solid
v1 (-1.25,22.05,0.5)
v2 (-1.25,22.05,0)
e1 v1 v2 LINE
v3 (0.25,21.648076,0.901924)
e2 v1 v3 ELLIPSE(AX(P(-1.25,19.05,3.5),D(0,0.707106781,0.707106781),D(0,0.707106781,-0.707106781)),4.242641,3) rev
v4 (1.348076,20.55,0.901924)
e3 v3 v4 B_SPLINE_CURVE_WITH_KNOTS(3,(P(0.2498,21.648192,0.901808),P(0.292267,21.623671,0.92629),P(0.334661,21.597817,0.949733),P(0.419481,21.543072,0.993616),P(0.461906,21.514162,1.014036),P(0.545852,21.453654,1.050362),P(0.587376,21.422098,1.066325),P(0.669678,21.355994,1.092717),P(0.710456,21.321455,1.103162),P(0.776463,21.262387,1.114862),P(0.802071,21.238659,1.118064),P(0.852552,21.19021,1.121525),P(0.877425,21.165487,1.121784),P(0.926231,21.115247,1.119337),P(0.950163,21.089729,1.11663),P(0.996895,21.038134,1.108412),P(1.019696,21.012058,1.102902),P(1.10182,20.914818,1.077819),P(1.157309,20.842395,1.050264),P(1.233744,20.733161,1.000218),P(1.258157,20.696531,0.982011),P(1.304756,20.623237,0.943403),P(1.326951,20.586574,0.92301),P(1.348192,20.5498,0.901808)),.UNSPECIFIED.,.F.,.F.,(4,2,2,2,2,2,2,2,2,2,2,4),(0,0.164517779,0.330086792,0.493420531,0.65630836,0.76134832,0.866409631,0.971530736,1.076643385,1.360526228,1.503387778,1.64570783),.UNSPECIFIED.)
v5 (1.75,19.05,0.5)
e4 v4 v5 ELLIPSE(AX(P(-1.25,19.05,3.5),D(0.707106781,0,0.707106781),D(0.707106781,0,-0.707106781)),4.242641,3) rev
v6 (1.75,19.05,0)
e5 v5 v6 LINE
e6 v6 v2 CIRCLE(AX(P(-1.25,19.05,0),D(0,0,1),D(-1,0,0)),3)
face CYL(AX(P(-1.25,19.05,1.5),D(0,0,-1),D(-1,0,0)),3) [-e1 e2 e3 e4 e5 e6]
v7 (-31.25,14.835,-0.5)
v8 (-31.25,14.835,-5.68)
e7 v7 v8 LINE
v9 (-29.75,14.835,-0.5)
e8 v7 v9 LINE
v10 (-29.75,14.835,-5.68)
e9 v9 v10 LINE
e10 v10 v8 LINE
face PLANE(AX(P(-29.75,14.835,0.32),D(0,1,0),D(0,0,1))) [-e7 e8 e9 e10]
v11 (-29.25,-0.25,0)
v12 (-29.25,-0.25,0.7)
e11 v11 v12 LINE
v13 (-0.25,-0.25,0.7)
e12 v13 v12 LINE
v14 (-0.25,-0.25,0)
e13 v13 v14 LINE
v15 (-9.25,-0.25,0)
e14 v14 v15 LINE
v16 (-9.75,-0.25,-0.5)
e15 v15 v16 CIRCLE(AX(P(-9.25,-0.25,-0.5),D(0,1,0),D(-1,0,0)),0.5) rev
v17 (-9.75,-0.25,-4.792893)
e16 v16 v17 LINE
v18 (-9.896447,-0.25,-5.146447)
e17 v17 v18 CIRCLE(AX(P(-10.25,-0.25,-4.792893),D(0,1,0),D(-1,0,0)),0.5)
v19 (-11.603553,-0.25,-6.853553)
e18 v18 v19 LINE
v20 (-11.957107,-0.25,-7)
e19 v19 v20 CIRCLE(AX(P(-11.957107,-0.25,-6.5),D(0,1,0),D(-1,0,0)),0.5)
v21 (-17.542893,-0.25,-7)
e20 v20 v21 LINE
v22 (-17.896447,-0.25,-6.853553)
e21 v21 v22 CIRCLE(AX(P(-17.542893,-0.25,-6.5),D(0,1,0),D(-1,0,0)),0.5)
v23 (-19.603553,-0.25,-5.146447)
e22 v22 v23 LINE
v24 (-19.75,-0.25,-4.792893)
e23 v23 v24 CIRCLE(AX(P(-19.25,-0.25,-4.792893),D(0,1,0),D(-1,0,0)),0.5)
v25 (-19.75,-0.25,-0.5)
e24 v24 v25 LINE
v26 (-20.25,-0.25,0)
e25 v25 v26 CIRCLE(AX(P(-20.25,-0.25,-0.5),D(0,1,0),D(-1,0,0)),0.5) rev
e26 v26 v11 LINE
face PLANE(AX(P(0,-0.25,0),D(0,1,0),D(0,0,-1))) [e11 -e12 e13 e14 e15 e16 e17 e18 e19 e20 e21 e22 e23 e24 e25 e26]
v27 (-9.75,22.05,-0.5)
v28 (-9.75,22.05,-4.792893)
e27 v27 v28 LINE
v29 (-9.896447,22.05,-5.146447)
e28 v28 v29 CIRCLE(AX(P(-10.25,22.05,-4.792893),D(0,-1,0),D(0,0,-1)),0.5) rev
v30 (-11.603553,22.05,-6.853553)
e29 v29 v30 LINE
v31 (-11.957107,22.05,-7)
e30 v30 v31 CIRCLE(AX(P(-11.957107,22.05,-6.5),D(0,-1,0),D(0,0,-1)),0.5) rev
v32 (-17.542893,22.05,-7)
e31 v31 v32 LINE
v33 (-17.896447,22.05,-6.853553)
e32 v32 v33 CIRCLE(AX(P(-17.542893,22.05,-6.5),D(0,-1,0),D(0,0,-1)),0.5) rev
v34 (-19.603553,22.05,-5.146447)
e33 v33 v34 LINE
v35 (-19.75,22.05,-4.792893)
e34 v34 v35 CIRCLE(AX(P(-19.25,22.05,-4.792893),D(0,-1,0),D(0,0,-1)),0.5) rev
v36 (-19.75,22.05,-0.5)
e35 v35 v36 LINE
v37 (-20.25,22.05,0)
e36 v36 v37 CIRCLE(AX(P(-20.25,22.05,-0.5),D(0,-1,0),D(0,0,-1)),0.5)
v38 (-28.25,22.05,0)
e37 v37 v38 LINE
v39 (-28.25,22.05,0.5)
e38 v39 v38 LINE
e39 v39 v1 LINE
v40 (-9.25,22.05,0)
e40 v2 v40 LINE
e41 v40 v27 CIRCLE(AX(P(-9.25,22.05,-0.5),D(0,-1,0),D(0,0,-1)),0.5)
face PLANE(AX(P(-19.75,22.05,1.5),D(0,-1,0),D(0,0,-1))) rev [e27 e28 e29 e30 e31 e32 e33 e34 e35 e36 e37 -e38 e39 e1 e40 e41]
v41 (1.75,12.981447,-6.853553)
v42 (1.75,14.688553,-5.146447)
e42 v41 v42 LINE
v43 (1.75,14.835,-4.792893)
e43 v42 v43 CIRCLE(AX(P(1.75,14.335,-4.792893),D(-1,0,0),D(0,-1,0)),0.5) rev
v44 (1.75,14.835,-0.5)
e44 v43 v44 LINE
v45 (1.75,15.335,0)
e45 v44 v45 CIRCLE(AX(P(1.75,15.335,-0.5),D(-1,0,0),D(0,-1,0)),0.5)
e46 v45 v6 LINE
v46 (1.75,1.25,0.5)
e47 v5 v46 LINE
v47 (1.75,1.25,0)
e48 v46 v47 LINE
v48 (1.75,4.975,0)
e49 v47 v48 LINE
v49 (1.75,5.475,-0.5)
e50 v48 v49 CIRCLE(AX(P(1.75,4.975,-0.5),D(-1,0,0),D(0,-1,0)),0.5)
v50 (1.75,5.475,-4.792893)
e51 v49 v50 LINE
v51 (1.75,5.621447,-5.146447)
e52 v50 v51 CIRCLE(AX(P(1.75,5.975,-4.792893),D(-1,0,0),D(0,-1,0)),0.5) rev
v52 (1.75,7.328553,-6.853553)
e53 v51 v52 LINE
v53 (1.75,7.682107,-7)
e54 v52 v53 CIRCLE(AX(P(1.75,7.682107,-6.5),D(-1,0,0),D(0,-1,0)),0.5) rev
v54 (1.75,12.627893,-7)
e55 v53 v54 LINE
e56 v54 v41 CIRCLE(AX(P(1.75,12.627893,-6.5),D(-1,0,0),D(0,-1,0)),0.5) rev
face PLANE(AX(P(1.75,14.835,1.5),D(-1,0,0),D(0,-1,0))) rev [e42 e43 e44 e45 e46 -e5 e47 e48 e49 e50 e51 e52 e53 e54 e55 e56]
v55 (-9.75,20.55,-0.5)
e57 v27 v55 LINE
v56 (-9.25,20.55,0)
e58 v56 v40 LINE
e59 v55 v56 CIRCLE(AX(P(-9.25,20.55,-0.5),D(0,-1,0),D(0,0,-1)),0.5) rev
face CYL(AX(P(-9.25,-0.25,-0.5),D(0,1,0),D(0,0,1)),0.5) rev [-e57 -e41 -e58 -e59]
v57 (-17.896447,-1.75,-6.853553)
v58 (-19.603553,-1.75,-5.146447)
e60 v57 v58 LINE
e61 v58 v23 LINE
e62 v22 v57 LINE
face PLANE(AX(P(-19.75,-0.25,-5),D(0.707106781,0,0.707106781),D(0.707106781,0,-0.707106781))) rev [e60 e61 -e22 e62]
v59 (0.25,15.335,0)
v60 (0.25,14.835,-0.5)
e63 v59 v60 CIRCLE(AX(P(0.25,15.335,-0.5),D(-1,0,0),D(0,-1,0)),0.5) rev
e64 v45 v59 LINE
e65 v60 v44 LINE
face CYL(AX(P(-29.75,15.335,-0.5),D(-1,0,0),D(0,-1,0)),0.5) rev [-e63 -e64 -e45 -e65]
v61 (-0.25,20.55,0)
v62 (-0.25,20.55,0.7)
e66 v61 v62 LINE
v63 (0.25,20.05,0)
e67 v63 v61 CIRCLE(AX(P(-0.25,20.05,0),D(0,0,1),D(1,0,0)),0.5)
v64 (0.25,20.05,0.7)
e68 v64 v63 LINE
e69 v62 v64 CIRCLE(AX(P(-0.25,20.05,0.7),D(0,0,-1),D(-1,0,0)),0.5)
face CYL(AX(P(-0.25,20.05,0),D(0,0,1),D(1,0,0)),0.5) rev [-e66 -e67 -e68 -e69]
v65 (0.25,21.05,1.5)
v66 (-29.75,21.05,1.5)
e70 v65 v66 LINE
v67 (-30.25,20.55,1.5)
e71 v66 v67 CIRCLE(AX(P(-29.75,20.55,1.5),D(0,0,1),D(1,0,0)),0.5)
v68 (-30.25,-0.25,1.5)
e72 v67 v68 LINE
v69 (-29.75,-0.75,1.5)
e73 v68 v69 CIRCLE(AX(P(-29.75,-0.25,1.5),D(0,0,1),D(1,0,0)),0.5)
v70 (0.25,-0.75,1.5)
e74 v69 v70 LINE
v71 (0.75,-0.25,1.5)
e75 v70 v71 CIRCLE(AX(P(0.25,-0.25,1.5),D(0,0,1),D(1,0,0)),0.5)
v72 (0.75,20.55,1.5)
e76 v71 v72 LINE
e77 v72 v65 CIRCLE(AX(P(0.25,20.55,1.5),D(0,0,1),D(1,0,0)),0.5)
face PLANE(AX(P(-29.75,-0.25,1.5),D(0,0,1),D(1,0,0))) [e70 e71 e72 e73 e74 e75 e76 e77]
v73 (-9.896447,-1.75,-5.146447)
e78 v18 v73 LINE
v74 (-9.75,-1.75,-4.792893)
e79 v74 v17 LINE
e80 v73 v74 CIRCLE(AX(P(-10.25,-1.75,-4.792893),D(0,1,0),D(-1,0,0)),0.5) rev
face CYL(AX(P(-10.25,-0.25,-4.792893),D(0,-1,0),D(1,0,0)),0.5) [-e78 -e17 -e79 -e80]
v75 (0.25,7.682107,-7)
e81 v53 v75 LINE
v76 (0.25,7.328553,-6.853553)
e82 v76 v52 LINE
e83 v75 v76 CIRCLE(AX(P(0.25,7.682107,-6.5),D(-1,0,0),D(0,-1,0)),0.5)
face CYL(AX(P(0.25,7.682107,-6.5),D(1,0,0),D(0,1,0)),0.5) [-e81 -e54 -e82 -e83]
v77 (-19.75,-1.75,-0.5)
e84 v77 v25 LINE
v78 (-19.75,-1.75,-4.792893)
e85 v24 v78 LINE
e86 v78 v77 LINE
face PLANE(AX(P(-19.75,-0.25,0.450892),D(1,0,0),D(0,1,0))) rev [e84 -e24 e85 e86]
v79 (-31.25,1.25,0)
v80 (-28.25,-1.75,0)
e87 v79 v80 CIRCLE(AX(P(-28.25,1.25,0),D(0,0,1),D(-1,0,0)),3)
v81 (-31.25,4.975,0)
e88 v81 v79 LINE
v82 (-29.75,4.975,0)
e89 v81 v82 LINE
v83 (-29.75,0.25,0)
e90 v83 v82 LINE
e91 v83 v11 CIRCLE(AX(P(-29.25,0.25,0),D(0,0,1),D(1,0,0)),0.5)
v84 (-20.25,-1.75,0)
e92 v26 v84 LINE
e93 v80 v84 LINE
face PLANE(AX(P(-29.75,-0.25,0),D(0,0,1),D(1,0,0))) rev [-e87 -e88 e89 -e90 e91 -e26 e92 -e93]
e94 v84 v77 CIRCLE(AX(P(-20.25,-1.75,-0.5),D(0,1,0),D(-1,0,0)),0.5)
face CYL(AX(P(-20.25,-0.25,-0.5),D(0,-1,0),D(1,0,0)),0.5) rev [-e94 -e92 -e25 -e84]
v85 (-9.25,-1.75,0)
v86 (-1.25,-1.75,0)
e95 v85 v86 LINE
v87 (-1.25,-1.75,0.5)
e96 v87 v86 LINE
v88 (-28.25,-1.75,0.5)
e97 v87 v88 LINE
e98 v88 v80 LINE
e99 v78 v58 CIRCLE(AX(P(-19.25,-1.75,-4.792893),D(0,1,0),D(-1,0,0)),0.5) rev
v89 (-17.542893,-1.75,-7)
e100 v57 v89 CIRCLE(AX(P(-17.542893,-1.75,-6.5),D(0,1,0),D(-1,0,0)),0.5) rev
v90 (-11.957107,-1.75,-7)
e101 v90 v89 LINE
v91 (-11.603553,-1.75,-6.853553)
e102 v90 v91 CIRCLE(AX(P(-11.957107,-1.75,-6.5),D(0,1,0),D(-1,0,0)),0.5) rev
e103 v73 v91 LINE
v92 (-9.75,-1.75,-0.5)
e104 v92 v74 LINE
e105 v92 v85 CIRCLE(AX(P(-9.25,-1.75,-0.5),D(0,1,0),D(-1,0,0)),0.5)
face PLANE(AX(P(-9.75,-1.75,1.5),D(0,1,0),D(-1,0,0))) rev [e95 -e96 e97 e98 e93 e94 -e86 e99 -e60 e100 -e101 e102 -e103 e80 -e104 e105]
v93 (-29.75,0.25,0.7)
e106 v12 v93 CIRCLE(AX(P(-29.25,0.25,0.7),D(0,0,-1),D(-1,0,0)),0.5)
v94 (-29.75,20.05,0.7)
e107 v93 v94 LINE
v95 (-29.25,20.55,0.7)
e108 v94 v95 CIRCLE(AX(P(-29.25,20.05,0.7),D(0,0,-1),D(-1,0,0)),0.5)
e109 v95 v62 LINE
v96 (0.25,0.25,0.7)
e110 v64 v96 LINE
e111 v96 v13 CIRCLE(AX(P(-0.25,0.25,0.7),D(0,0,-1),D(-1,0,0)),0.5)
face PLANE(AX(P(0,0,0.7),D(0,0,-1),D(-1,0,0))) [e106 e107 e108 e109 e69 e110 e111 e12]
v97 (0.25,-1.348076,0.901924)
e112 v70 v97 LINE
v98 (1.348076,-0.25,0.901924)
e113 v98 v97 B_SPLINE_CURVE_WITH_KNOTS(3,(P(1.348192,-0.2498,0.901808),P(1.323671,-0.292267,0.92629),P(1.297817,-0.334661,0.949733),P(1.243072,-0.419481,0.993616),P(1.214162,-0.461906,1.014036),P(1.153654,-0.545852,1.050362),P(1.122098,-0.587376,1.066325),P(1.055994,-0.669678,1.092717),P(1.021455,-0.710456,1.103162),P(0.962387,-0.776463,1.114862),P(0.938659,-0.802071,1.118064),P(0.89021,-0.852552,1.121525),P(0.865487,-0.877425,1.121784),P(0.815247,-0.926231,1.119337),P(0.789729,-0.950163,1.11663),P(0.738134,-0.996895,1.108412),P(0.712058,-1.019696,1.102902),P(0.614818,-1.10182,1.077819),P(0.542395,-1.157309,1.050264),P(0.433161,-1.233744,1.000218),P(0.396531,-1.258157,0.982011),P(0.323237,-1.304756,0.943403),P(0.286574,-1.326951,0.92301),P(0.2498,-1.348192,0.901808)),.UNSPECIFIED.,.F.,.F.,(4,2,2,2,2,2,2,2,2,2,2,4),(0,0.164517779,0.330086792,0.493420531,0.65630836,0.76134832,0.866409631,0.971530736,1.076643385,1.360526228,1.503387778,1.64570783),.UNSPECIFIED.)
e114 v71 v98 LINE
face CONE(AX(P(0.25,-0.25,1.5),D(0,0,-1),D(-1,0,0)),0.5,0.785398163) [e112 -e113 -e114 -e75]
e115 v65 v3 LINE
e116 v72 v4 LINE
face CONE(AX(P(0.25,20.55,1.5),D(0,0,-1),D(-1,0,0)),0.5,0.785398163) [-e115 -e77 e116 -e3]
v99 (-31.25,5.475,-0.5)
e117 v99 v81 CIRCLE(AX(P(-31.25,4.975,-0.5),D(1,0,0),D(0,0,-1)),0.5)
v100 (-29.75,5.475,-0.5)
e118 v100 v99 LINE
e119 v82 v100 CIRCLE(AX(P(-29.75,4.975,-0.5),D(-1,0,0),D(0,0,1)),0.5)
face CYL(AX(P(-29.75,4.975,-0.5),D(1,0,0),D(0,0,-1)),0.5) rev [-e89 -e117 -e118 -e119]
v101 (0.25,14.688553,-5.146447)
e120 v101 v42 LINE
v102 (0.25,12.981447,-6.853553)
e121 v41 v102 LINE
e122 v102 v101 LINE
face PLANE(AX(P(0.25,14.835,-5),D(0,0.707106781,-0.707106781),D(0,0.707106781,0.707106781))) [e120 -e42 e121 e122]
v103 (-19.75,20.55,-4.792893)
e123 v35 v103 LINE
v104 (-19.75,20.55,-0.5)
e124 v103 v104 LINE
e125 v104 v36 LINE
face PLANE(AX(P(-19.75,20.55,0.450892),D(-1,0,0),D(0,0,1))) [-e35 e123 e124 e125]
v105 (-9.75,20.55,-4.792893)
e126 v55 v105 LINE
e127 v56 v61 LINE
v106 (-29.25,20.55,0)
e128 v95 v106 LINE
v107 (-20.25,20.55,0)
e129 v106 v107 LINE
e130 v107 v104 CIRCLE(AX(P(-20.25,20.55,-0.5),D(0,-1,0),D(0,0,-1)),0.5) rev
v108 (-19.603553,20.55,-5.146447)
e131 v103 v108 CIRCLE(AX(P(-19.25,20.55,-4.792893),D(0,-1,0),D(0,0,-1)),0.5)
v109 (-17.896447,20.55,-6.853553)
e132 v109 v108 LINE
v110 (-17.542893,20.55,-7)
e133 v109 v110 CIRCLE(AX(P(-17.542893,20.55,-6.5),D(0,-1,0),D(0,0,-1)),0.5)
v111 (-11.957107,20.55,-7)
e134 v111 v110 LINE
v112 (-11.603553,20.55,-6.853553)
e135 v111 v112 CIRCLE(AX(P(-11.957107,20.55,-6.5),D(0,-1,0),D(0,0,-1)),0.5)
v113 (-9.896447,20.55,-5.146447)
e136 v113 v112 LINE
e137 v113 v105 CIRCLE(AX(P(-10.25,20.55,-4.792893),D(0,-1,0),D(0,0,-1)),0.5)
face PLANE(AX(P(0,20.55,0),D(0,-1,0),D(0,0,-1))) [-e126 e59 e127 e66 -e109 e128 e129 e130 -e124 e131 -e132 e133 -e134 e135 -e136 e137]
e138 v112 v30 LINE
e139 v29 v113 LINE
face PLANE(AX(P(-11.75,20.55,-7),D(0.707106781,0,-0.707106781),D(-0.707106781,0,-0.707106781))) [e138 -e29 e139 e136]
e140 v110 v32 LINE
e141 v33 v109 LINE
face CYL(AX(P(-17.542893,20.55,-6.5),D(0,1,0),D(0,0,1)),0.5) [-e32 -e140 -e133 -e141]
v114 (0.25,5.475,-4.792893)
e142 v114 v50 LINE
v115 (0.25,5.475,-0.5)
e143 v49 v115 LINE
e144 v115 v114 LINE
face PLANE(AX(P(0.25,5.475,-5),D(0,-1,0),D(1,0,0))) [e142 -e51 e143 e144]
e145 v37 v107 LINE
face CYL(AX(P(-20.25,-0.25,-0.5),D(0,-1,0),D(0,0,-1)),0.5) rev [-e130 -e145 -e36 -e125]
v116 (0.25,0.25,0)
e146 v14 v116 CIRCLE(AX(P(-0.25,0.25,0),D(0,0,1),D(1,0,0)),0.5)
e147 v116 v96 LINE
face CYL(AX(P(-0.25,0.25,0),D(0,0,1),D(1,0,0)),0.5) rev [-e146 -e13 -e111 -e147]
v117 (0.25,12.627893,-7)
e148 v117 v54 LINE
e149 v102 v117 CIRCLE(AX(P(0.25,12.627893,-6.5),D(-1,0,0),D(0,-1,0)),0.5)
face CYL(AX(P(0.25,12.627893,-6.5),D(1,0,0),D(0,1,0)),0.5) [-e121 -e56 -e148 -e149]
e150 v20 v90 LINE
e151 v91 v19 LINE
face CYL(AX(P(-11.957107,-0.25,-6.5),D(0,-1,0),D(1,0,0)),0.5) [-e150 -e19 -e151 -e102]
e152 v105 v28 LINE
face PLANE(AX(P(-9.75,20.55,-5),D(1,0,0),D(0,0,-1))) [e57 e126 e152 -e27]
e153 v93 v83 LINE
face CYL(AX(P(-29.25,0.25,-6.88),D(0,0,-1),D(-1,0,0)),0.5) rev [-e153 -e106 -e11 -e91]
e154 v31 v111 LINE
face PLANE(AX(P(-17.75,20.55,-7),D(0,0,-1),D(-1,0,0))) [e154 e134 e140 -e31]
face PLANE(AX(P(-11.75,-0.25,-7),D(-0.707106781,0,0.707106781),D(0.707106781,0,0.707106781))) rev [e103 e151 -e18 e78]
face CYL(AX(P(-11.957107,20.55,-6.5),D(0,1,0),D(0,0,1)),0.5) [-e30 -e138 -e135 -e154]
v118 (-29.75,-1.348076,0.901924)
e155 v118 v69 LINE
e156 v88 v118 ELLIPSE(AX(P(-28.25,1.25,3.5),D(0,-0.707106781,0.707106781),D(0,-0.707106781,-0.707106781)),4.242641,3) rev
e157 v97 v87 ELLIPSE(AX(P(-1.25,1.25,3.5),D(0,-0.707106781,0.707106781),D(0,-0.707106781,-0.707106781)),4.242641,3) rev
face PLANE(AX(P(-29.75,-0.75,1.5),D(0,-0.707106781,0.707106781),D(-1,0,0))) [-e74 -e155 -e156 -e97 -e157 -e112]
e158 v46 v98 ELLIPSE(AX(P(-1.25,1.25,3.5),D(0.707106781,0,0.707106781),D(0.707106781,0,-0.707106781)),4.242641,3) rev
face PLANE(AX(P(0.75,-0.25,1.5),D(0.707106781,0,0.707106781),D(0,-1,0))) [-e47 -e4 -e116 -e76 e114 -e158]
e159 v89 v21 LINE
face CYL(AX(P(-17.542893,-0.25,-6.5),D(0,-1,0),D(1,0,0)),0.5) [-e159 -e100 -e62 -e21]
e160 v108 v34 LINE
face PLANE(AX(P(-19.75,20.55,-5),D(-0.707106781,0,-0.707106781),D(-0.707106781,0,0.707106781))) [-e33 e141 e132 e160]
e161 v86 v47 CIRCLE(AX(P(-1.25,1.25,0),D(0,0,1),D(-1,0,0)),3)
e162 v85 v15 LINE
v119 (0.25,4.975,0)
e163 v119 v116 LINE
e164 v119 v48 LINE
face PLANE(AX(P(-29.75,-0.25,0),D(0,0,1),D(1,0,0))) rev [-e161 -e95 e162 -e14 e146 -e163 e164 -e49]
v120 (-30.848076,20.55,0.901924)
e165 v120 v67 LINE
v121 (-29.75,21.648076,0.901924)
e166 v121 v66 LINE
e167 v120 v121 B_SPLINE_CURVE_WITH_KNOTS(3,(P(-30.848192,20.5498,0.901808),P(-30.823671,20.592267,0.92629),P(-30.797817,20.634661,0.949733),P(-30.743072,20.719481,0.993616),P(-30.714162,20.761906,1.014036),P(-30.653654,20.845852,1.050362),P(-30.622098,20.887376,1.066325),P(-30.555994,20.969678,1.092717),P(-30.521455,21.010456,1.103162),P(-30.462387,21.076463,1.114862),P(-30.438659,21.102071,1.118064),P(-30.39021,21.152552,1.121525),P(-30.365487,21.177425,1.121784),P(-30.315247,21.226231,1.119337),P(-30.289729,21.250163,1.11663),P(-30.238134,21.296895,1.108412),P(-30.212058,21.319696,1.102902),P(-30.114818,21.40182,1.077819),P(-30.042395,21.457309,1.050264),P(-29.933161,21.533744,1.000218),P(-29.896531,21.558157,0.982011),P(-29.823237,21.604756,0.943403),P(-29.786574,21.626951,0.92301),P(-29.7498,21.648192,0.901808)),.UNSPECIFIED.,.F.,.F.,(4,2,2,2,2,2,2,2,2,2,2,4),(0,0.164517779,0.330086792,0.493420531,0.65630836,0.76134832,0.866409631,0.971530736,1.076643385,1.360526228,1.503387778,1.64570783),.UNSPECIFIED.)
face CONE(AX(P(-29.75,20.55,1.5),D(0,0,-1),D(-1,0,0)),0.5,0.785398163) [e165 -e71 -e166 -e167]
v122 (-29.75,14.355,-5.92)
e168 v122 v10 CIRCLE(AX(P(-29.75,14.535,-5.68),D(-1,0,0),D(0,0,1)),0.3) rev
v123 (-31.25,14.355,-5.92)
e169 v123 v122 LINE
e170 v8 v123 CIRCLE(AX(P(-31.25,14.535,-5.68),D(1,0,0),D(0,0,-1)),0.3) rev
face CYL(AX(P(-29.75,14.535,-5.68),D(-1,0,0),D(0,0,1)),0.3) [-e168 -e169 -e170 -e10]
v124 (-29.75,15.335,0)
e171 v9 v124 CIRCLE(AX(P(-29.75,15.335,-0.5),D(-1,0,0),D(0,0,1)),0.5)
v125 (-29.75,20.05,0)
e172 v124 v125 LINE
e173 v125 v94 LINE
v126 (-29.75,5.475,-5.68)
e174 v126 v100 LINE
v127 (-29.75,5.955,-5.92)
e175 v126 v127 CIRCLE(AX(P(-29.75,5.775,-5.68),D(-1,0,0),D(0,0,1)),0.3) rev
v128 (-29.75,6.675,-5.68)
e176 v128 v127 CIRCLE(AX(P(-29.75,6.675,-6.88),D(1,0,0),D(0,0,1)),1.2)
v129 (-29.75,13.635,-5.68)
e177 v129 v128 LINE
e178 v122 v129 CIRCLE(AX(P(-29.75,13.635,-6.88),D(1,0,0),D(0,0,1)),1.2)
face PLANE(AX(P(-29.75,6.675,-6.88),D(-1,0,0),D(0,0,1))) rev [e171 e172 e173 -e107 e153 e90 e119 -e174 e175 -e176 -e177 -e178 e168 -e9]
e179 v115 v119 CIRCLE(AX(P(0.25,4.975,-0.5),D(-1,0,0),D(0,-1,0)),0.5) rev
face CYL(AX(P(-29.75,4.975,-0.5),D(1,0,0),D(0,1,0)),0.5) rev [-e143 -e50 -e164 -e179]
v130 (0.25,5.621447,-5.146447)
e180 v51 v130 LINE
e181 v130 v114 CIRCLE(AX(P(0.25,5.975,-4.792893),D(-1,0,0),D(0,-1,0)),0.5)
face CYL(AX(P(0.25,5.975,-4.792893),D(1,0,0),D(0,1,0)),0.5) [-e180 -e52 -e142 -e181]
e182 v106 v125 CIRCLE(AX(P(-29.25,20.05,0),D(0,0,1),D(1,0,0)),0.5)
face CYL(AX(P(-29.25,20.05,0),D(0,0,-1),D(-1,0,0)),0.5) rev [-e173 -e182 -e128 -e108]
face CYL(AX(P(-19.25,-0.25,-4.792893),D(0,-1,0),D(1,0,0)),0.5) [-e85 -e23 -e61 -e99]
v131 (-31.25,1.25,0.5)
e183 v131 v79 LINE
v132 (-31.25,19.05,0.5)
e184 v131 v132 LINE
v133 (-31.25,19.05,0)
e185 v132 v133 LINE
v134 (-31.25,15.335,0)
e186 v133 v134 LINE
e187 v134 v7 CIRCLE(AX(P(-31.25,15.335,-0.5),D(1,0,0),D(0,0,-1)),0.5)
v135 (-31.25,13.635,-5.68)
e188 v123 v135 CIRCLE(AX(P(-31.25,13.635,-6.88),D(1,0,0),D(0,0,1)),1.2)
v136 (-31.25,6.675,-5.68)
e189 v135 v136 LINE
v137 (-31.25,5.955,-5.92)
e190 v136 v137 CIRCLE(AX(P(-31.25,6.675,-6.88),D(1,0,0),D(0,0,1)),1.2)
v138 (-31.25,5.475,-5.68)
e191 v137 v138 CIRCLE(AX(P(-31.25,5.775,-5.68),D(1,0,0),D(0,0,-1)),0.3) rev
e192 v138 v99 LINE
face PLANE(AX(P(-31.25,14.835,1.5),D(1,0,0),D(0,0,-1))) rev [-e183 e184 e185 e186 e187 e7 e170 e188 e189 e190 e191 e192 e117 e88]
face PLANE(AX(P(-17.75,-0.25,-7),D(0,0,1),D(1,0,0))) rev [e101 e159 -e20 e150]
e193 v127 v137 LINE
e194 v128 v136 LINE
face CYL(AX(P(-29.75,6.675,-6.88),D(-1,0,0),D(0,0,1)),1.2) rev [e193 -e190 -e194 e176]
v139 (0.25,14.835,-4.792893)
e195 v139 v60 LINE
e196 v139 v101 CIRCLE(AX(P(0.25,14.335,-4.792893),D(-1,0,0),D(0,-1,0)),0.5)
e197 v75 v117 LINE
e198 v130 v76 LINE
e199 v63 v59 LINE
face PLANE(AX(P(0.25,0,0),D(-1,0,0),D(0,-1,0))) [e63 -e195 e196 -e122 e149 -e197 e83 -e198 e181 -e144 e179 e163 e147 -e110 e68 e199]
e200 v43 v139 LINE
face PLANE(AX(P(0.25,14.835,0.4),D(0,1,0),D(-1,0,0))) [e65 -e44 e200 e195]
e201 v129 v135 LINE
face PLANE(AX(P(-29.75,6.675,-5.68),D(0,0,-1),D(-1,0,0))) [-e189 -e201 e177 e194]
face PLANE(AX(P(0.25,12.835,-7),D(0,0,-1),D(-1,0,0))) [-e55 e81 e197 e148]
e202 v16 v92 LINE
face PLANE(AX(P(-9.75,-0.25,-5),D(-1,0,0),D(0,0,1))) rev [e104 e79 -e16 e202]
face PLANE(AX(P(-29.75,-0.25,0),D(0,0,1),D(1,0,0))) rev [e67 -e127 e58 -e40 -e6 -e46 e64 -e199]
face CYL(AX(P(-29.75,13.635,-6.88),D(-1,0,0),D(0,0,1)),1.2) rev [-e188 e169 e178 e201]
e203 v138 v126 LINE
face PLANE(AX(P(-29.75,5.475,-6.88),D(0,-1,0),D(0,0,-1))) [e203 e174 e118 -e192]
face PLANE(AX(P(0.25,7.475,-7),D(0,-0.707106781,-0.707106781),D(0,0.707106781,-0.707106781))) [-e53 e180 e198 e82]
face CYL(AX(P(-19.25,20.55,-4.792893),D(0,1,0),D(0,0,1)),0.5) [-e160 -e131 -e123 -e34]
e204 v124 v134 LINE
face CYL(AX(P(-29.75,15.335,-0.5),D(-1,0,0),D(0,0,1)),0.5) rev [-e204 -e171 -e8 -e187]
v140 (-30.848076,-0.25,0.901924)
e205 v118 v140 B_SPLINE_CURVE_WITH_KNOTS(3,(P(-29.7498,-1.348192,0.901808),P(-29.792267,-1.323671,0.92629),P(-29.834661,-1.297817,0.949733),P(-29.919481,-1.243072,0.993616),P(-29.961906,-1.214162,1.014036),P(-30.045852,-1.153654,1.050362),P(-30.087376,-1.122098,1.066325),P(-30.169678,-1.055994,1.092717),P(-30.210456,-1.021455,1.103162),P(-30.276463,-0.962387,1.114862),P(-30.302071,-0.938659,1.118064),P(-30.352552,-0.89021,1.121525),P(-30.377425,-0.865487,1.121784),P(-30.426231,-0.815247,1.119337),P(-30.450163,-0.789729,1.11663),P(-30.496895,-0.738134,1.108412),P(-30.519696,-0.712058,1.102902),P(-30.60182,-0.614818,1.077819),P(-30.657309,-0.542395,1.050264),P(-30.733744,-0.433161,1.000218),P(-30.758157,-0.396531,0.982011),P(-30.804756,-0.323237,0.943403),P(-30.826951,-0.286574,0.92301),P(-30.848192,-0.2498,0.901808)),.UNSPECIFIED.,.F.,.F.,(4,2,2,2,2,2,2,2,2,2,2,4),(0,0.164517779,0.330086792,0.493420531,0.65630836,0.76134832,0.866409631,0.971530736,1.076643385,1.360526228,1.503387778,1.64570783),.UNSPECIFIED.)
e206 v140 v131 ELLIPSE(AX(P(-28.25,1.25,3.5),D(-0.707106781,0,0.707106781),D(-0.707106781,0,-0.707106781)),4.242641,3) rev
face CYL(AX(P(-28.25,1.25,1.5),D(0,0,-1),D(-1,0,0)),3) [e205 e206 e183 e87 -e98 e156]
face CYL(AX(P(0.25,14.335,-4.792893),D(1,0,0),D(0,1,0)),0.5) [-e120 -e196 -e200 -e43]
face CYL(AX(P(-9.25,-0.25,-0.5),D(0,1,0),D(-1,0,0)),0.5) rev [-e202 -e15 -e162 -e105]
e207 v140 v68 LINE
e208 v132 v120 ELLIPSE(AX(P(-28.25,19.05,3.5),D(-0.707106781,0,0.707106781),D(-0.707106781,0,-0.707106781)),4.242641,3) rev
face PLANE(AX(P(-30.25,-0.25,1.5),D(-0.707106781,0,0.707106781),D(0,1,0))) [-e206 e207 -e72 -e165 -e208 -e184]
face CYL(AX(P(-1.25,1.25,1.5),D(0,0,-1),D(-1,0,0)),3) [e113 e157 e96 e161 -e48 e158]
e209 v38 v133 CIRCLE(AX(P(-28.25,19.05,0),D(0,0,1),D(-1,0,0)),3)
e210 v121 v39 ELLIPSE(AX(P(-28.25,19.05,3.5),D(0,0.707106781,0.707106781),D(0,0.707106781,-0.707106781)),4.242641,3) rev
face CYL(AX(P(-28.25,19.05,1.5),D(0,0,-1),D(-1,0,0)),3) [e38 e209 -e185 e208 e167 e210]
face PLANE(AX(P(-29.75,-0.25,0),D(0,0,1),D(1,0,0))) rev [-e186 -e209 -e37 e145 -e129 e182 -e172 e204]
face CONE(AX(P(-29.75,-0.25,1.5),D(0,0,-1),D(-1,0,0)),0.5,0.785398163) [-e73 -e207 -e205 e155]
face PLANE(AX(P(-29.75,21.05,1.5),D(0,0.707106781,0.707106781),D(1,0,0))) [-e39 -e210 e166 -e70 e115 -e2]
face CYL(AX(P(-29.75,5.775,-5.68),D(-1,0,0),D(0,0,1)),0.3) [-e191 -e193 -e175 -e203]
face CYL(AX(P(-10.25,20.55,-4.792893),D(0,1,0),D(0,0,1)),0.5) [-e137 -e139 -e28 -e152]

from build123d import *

# Parameters (mm, degrees)
EXTRUDE_1_DEPTH     = 1.5
CHAMFER_1_SIZE      = 1
EXTRUDE_3_DEPTH     = 1.5
EXTRUDE_4_DEPTH     = 1.5
EXTRUDE_5_DEPTH     = 1.5
FILLET_START        = -32
FILLET_2_DEPTH      = 3
FILLET_3_R          = 0.5
SKETCH_8_W          = 30
SKETCH_8_H          = 20.8
CUT_EXTRUDE_1_DEPTH = 0.7
FILLET_4_R          = 0.5
CUT_EXTRUDE_8_DEPTH = 39.881422299


with BuildPart() as part:
    # 草图1 → 凸台-拉伸1 (new body)
    with BuildSketch(Plane.XY):
        with BuildLine():
            Line((-29.75, -1.75), (-19.75, -1.75))
            Line((-19.75, -1.75), (-9.75, -1.75))
            Line((-9.75, -1.75), (0.25, -1.75))
            ThreePointArc((0.25, -1.75), (1.310660172, -1.310660172), (1.75, -0.25))
            Line((1.75, -0.25), (1.75, 5.475))
            Line((1.75, 5.475), (1.75, 14.835))
            Line((1.75, 14.835), (1.75, 20.55))
            ThreePointArc((1.75, 20.55), (1.310660172, 21.610660172), (0.25, 22.05))
            Line((0.25, 22.05), (-9.75, 22.05))
            Line((-9.75, 22.05), (-19.75, 22.05))
            Line((-19.75, 22.05), (-29.75, 22.05))
            ThreePointArc((-29.75, 22.05), (-30.810660172, 21.610660172), (-31.25, 20.55))
            Line((-31.25, 20.55), (-31.25, 14.835))
            Line((-31.25, 14.835), (-31.25, 5.475))
            Line((-31.25, 5.475), (-31.25, -0.25))
            ThreePointArc((-31.25, -0.25), (-30.810660172, -1.310660172), (-29.75, -1.75))
        make_face()
    extrude(amount=EXTRUDE_1_DEPTH)

    # 倒角1
    chamfer_1_edges = [part.edges().sort_by_distance(p)[0] for p in [
        (-14.75, -1.75, 1.5),
        (1.310660172, -1.310660172, 1.5),
        (1.75, 10.15, 1.5),
        (1.310660172, 21.610660172, 1.5),
        (-14.75, 22.05, 1.5),
        (-31.25, 10.15, 1.5),
        (-30.810660172, 21.610660172, 1.5),
        (-30.810660172, -1.310660172, 1.5),
    ]]
    chamfer(chamfer_1_edges, length=CHAMFER_1_SIZE)

    # 草图3 → 凸台-拉伸3 (add)
    with BuildSketch(Plane(origin=(0, 22.05, 0), x_dir=(1, 0, 0), z_dir=(0, 1, 0))):
        Polygon((-19.75, -0.450892119), (-9.75, -0.450892119), (-9.75, 5), (-11.75, 7), (-17.75, 7), (-19.75, 5), align=None)
    extrude_3 = extrude(amount=-EXTRUDE_3_DEPTH)

    # 镜向1: 凸台-拉伸3 across plane
    add(extrude_3.mirror(Plane.ZX.offset(10.15)))

    # 草图4 → 凸台-拉伸4 (add)
    with BuildSketch(Plane(origin=(1.75, 0, 0), x_dir=(0, 0, -1), z_dir=(1, 0, 0))):
        Polygon((-0.4, 14.835), (5, 14.835), (7, 12.835), (7, 7.475), (5, 5.475), (-0.4, 5.475), align=None)
    extrude(amount=-EXTRUDE_4_DEPTH)

    # 草图6 → 凸台-拉伸5 (add)
    with BuildSketch(Plane.ZY.offset(31.25)):
        with BuildLine():
            Line((0.32, 14.835), (0.32, 5.475))
            Line((0.32, 5.475), (-6.88, 5.475))
            ThreePointArc((-6.88, 5.475), (-6.031471863, 5.826471863), (-5.68, 6.675))
            Line((-5.68, 6.675), (-5.68, 13.635))
            ThreePointArc((-5.68, 13.635), (-6.031471863, 14.483528137), (-6.88, 14.835))
            Line((-6.88, 14.835), (0.32, 14.835))
        make_face()
    extrude(amount=-EXTRUDE_5_DEPTH)

    # 圆角2: read off the stored shape, not the designer's step
    # 圆角2 outline → 圆角2 (cut)
    with BuildSketch(Plane.YZ.offset(FILLET_START)):
        with BuildLine():
            Line((14.835, -6.88), (14.835, -5.68))
            ThreePointArc((14.835, -5.68), (14.669164079, -5.948328157), (14.355, -5.92))
            ThreePointArc((14.355, -5.92), (14.708312629, -6.343343686), (14.835, -6.88))
        make_face()
        with BuildLine():
            ThreePointArc((5.475, -6.88), (5.601687371, -6.343343686), (5.955, -5.92))
            ThreePointArc((5.955, -5.92), (5.640835921, -5.948328157), (5.475, -5.68))
            Line((5.475, -5.68), (5.475, -6.88))
        make_face()
    extrude(amount=FILLET_2_DEPTH, mode=Mode.SUBTRACT)

    # 圆角3
    fillet_3_edges = [part.edges().sort_by_distance(p)[0] for p in [
        (-9.75, -1, 0),
        (-19.75, -1, 0),
        (-19.75, -1, -5),
        (-9.75, -1, -5),
        (-11.75, -1, -7),
        (-17.75, -1, -7),
        (1, 5.475, -5),
        (1, 14.835, 0),
        (1, 14.835, -5),
        (1, 12.835, -7),
        (1, 7.475, -7),
        (1, 5.475, 0),
        (-30.5, 14.835, 0),
        (-30.5, 5.475, 0),
        (-9.75, 21.3, 0),
        (-19.75, 21.3, 0),
        (-9.75, 21.3, -5),
        (-19.75, 21.3, -5),
        (-17.75, 21.3, -7),
        (-11.75, 21.3, -7),
    ]]
    fillet(fillet_3_edges, radius=FILLET_3_R)

    # 草图8 → 切除-拉伸1 (cut)
    with BuildSketch(Plane(origin=(0, 0, 0), x_dir=(-1, 0, 0), z_dir=(0, 0, -1))):
        with Locations((14.75, 10.15)):
            Rectangle(SKETCH_8_W, SKETCH_8_H)
    extrude(amount=-CUT_EXTRUDE_1_DEPTH, mode=Mode.SUBTRACT)

    # 圆角4
    fillet_4_edges = [part.edges().sort_by_distance(p)[0] for p in [
        (-29.75, 20.55, 0.35),
        (-29.75, -0.25, 0.35),
        (0.25, -0.25, 0.35),
        (0.25, 20.55, 0.35),
    ]]
    fillet(fillet_4_edges, radius=FILLET_4_R)

    # 草图12 → 切除-拉伸8 (cut, through all)
    with BuildSketch(Plane(origin=(0, 0, 0), x_dir=(-1, 0, 0), z_dir=(0, 0, -1))):
        with BuildLine():
            Line((1.25, 22.05), (-0.25, 22.05))
            ThreePointArc((-0.25, 22.05), (-1.310660172, 21.610660172), (-1.75, 20.55))
            Line((-1.75, 20.55), (-1.75, 19.05))
            ThreePointArc((-1.75, 19.05), (-0.871320344, 21.171320344), (1.25, 22.05))
        make_face()
        with BuildLine():
            Line((31.25, 19.05), (31.25, 20.55))
            ThreePointArc((31.25, 20.55), (30.810660172, 21.610660172), (29.75, 22.05))
            Line((29.75, 22.05), (28.25, 22.05))
            ThreePointArc((28.25, 22.05), (30.371320344, 21.171320344), (31.25, 19.05))
        make_face()
        with BuildLine():
            Line((28.25, -1.75), (29.75, -1.75))
            ThreePointArc((29.75, -1.75), (30.810660172, -1.310660172), (31.25, -0.25))
            Line((31.25, -0.25), (31.25, 1.25))
            ThreePointArc((31.25, 1.25), (30.371320344, -0.871320344), (28.25, -1.75))
        make_face()
        with BuildLine():
            Line((-1.75, 1.25), (-1.75, -0.25))
            ThreePointArc((-1.75, -0.25), (-1.310660172, -1.310660172), (-0.25, -1.75))
            Line((-0.25, -1.75), (1.25, -1.75))
            ThreePointArc((1.25, -1.75), (-0.871320344, -0.871320344), (-1.75, 1.25))
        make_face()
    extrude(amount=-CUT_EXTRUDE_8_DEPTH, mode=Mode.SUBTRACT)


solid = part.part
